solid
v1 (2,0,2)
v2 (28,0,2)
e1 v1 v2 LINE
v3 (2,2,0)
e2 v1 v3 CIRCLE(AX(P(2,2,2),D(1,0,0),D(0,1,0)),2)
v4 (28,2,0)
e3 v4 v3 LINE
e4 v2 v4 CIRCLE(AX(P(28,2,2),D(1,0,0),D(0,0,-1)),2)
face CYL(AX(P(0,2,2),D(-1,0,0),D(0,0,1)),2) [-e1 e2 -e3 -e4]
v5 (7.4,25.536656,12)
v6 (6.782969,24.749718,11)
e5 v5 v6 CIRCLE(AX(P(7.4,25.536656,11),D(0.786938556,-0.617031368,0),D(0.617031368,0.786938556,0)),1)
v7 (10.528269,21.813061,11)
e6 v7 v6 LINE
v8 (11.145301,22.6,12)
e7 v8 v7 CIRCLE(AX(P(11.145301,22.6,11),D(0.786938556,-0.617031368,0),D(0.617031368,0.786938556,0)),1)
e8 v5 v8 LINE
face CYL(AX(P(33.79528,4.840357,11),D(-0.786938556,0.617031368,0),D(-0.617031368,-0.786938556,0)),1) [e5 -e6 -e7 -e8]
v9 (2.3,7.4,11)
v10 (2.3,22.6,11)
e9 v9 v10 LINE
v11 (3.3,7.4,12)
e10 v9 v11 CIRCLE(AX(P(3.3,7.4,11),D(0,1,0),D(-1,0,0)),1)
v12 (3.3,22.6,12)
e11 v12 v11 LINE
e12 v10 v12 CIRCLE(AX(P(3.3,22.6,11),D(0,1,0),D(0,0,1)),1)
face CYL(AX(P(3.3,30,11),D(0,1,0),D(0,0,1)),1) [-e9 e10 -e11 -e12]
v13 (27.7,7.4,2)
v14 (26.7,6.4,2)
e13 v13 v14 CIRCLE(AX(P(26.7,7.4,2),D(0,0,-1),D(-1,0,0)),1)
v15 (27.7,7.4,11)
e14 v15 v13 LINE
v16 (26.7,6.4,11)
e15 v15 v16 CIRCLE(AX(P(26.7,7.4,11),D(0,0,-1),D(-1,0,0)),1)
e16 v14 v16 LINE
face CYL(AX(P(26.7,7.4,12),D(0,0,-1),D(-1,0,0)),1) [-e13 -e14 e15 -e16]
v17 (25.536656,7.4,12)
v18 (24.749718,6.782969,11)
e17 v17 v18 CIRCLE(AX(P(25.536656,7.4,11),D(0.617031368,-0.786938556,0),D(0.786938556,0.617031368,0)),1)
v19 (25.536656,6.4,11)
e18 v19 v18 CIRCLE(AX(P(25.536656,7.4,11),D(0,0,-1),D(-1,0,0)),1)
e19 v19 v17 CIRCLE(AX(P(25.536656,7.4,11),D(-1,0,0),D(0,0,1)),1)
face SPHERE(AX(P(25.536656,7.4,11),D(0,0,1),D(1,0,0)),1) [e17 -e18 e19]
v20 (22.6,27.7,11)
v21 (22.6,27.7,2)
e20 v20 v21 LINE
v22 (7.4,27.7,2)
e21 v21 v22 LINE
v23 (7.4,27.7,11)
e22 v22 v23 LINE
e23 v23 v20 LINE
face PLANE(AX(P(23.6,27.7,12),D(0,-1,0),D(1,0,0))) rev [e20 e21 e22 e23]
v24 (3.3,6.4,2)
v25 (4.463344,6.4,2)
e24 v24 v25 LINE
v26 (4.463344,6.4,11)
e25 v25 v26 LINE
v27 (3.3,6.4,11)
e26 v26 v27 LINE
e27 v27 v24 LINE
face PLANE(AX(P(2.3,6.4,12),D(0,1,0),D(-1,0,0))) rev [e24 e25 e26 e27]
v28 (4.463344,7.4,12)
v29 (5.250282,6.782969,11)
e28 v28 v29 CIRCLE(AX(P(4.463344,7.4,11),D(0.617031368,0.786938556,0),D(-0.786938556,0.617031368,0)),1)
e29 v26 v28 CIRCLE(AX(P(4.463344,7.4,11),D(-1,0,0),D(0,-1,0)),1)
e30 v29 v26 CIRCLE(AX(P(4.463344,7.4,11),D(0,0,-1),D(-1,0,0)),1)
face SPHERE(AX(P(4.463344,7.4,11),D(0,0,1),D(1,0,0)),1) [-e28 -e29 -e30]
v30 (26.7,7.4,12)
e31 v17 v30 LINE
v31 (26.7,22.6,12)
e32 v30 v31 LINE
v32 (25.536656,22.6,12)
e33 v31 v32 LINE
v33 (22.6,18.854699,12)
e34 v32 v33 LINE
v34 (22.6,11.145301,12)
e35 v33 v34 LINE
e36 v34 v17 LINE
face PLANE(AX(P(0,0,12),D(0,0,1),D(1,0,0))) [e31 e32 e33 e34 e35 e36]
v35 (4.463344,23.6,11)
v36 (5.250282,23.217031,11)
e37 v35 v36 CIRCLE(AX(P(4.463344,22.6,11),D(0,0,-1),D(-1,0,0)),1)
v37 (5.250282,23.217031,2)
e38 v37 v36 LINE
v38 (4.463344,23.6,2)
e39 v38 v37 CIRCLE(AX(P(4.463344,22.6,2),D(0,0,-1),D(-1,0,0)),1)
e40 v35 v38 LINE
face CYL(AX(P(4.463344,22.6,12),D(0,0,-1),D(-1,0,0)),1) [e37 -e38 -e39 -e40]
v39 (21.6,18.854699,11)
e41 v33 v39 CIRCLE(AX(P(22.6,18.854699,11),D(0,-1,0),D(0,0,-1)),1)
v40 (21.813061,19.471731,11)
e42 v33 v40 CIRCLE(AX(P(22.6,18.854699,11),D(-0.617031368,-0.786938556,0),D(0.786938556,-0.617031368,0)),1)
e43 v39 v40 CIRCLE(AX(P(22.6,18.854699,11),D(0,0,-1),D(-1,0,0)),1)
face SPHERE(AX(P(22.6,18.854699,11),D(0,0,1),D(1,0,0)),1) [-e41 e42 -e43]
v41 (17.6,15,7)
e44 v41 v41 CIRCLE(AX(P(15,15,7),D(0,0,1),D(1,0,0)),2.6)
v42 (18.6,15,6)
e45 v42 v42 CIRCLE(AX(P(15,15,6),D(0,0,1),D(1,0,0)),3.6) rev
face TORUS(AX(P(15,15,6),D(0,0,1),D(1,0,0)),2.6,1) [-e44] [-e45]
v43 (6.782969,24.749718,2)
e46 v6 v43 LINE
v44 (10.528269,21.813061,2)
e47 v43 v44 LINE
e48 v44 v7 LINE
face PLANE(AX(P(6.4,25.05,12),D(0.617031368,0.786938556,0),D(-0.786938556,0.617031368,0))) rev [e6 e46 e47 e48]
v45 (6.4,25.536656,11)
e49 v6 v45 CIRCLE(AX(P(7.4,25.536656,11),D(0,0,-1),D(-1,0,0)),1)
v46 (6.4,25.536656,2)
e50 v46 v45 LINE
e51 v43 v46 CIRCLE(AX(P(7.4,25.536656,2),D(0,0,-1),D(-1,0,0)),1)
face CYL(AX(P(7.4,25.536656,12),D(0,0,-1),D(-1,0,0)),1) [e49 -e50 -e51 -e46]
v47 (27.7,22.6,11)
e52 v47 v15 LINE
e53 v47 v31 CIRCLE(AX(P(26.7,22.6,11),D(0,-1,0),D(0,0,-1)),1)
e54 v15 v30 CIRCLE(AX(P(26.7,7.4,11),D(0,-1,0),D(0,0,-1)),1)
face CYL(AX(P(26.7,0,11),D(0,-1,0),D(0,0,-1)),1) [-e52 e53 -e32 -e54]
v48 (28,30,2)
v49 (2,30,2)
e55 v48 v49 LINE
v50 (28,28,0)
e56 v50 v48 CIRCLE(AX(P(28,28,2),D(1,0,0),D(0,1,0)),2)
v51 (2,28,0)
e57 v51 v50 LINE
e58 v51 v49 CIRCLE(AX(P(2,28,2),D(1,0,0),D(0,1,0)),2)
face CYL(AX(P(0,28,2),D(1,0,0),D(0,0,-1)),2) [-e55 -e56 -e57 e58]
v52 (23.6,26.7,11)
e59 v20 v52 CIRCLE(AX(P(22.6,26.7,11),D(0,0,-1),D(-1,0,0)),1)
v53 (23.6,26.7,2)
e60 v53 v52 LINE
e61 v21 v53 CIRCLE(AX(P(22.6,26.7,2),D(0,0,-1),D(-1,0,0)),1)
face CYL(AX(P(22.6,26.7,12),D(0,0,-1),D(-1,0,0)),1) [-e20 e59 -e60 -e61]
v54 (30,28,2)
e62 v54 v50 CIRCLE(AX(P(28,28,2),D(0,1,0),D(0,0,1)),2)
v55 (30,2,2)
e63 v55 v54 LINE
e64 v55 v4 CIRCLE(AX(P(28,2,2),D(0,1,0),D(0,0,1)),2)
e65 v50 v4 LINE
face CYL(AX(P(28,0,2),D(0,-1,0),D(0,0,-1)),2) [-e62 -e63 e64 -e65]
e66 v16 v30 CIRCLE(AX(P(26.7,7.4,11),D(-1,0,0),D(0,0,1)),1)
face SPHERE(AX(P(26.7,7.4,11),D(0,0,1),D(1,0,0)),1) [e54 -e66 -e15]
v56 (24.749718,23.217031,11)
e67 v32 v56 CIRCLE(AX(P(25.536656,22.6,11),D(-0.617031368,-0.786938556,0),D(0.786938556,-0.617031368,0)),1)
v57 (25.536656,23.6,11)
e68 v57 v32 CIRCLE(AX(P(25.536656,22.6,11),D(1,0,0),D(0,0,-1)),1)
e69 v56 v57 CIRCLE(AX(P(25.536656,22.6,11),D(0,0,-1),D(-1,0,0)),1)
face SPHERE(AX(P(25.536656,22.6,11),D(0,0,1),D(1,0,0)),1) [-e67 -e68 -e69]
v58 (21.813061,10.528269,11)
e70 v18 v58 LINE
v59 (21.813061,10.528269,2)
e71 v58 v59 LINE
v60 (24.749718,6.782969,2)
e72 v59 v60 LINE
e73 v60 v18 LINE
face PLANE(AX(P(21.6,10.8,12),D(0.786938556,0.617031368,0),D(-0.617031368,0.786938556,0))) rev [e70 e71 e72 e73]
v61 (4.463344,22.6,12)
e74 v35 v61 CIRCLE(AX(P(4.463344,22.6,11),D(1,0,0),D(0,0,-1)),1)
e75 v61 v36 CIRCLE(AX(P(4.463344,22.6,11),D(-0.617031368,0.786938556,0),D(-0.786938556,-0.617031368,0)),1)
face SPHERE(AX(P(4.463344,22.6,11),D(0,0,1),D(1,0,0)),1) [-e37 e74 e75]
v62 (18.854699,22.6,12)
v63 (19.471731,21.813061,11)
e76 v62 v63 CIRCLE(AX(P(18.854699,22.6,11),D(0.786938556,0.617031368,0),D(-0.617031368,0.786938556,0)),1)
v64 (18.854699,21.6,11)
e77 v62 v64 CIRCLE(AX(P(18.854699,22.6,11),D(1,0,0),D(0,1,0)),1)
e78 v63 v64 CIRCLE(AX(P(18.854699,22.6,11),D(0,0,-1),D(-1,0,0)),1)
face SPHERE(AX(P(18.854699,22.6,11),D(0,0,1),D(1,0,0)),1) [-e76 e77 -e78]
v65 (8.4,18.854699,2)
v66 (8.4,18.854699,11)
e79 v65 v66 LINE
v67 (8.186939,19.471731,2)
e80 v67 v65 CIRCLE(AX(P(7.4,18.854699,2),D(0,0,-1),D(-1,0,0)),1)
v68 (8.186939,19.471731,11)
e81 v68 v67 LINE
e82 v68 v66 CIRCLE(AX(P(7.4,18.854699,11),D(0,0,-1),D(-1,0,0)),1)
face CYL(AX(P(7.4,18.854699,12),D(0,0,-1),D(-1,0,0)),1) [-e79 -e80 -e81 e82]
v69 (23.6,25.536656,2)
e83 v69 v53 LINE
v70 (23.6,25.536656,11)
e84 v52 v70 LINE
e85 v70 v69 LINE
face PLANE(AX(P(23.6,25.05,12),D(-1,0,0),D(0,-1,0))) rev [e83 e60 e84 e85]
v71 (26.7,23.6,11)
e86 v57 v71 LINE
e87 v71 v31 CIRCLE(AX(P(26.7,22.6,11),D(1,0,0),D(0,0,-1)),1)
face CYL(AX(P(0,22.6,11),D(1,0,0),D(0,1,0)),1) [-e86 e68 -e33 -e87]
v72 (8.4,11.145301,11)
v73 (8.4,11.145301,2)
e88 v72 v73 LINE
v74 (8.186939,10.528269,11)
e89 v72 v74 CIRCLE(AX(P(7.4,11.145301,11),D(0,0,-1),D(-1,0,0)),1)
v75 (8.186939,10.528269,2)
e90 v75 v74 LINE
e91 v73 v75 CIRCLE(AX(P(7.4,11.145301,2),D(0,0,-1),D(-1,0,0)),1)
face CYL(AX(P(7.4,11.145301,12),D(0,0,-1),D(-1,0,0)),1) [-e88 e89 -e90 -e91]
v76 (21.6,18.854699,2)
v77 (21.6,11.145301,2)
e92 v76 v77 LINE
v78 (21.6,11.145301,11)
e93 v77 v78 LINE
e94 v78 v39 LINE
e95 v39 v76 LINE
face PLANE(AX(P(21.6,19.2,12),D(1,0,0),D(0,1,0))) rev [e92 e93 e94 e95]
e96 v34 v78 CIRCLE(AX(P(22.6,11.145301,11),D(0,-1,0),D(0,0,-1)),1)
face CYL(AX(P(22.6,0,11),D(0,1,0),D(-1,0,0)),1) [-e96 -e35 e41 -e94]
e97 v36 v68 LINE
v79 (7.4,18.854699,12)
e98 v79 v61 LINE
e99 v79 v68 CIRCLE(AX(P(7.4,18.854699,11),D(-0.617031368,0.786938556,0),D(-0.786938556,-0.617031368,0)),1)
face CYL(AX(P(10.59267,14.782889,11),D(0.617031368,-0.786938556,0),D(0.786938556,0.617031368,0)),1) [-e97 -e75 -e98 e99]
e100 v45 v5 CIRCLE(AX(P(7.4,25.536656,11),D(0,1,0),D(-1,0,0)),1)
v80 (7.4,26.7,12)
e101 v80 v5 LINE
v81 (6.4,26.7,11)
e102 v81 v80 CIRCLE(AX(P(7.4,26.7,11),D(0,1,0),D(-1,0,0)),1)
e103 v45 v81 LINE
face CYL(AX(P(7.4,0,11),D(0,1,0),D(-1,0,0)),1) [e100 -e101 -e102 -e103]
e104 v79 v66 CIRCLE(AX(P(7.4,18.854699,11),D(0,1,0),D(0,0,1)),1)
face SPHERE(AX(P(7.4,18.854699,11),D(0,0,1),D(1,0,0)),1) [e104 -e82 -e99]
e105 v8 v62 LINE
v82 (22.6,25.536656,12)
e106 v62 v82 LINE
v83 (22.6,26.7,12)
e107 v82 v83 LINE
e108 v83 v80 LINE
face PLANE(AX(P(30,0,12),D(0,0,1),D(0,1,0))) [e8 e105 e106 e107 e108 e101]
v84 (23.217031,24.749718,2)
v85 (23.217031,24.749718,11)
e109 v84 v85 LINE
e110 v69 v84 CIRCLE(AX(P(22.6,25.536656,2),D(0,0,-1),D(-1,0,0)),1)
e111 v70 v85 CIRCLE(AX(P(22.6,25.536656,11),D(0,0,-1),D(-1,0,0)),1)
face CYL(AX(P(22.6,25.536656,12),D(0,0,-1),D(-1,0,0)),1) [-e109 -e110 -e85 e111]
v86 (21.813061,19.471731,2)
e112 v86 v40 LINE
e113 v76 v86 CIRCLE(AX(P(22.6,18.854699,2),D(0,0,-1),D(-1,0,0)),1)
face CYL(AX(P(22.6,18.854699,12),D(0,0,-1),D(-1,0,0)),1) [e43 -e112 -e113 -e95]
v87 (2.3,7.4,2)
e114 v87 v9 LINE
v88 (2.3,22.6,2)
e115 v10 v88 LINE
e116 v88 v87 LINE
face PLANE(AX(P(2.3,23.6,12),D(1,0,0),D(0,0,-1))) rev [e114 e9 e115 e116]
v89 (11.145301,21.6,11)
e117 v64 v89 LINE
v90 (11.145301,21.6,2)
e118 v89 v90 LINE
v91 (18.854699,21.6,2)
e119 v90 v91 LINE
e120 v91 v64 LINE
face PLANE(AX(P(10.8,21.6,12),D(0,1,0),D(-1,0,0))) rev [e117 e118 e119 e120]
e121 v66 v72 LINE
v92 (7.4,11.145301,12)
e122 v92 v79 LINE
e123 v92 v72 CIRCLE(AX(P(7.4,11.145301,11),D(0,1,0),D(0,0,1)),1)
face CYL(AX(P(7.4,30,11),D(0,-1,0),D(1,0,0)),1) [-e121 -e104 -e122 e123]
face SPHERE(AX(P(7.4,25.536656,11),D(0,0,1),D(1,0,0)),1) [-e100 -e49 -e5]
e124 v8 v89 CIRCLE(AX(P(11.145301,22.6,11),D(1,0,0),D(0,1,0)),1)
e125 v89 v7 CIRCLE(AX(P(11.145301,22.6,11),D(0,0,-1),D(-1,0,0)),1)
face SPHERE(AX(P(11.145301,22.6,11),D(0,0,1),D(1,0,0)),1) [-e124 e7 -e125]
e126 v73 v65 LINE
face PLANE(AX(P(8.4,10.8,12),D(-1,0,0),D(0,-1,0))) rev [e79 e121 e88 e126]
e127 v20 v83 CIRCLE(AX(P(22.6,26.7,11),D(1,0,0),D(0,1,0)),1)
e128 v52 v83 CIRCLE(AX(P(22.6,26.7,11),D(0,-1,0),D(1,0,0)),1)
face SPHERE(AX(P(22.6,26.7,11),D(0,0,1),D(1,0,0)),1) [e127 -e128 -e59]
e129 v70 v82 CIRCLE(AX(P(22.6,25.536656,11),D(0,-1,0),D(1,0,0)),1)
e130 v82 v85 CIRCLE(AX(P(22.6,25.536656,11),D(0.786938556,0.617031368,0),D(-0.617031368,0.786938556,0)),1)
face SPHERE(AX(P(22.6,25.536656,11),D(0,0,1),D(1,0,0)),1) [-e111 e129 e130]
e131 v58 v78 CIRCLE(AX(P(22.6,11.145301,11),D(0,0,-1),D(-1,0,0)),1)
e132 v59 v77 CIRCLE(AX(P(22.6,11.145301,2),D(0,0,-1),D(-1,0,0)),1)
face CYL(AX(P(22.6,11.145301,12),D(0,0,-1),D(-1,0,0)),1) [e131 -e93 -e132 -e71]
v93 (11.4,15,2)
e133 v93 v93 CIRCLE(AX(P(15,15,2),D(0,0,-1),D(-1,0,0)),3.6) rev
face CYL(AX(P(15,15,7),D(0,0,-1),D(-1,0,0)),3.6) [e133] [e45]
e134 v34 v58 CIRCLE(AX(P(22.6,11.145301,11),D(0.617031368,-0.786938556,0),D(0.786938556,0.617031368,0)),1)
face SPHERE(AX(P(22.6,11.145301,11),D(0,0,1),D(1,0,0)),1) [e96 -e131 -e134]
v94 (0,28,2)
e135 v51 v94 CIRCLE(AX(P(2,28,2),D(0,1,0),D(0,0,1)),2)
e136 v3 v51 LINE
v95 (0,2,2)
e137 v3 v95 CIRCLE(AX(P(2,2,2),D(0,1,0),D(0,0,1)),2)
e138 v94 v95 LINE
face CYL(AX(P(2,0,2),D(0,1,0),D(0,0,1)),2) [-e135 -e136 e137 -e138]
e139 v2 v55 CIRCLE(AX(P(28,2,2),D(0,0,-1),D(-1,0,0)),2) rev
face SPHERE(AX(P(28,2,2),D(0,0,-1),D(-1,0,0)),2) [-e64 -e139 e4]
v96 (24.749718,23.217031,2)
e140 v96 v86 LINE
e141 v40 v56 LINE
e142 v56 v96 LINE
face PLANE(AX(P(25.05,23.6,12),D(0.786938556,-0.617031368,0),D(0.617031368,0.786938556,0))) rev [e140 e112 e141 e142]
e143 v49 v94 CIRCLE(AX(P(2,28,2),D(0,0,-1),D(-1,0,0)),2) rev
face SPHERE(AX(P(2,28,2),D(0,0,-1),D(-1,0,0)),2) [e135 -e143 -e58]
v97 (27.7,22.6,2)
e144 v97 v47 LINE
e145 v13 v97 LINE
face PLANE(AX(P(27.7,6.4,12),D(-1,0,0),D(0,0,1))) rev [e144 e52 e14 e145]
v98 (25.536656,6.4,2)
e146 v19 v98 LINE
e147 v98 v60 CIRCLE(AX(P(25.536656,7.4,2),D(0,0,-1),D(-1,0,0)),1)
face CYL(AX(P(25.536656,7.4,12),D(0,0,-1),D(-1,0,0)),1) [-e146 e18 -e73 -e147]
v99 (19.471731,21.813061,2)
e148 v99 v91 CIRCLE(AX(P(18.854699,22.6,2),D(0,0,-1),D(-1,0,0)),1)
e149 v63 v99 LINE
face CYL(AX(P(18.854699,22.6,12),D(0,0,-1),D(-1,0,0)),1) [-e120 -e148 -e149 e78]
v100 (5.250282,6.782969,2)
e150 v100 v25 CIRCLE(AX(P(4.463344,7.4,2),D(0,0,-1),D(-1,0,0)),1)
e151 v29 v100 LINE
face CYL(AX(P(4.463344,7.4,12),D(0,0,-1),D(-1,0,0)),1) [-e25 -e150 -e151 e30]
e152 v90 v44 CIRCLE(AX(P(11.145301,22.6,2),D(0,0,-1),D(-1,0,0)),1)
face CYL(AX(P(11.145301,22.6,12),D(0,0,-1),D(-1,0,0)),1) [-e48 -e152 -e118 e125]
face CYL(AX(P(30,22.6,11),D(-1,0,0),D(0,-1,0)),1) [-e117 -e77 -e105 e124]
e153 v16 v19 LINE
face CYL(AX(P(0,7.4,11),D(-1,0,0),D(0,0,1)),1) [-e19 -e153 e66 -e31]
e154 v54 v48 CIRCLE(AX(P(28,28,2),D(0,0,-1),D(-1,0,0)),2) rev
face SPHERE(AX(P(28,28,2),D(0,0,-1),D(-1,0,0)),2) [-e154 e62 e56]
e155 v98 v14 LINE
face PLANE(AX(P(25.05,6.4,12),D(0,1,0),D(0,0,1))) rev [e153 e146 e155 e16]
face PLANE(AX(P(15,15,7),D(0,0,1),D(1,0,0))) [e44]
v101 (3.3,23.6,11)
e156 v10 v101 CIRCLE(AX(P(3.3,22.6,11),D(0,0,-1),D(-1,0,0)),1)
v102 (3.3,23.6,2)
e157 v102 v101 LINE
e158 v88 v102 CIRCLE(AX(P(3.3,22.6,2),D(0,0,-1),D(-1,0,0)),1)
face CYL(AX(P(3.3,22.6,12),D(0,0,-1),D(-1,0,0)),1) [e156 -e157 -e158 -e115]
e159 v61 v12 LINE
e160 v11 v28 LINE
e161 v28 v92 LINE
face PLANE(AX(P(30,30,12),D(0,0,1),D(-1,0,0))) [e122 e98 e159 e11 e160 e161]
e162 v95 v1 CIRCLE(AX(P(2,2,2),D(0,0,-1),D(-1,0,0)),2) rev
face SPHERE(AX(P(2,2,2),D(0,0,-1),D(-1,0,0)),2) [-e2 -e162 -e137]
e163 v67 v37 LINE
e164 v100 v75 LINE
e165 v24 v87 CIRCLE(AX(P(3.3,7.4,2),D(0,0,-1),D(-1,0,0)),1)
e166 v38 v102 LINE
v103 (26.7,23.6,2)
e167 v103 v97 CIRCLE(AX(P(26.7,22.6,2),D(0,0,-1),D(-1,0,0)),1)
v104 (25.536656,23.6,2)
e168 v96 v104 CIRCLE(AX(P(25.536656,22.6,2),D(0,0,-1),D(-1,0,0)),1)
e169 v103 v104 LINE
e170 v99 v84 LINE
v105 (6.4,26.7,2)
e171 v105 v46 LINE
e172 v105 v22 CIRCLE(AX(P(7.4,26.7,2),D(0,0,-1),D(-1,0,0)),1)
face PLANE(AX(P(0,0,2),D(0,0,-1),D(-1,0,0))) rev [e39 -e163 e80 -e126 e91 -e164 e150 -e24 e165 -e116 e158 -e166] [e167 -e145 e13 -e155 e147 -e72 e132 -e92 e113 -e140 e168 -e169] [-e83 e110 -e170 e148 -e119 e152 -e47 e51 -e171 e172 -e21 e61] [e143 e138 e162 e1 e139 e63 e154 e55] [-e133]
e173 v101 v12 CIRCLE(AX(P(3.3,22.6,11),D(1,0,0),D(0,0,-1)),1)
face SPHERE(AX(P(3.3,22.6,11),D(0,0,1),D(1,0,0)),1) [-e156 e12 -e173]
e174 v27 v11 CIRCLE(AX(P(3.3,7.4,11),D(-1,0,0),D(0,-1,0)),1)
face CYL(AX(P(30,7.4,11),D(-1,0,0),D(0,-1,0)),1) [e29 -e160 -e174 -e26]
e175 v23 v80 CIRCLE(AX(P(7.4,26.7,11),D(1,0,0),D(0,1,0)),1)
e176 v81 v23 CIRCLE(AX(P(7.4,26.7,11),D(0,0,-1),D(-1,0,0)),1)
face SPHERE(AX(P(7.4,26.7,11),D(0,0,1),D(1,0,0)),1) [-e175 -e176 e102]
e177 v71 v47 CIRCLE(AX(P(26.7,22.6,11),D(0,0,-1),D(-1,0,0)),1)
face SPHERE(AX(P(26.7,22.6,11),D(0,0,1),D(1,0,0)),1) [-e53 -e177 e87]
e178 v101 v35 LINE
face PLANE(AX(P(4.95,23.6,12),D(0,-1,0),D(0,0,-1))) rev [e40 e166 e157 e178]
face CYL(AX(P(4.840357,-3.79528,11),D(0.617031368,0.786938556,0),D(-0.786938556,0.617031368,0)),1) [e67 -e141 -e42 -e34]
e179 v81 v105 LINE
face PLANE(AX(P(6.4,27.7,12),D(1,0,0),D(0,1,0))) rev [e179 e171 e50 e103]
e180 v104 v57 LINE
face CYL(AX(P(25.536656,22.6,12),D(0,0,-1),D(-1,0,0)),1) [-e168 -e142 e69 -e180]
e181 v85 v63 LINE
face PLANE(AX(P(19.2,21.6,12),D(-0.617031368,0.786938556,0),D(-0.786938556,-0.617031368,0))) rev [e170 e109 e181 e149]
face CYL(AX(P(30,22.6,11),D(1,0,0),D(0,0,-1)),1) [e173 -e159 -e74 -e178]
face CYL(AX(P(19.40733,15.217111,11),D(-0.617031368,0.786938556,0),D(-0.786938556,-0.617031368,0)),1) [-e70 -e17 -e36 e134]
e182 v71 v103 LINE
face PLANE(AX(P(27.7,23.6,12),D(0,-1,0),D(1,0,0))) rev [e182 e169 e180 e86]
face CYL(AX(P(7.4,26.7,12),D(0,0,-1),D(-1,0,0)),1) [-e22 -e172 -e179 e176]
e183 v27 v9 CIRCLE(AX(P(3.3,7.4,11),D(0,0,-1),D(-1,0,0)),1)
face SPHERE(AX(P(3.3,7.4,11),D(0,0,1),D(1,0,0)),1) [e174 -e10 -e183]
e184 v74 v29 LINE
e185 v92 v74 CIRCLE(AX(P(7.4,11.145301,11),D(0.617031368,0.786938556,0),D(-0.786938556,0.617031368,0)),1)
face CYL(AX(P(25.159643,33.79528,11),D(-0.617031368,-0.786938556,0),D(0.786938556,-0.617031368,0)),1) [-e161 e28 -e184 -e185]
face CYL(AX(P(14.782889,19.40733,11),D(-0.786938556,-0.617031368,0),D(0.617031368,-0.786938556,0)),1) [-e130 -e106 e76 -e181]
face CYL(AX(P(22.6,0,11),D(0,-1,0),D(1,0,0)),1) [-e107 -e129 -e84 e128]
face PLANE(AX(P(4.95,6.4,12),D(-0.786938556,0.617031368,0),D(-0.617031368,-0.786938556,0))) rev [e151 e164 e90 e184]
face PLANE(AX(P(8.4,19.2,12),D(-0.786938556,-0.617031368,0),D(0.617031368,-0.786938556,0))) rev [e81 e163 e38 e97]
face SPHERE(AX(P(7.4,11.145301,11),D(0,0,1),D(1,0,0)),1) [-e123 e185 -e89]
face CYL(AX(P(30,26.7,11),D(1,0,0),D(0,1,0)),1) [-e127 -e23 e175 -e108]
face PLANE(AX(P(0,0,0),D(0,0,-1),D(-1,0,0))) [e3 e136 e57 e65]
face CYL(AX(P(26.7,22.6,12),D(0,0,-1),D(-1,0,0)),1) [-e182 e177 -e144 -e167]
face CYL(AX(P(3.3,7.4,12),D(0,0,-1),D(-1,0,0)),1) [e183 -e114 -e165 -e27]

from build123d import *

# Parameters (mm, degrees)
ESQUISSE1_W                        = 30
ESQUISSE1_H                        = 30
BOSS_EXTRU_1_DEPTH                 = 2
BOSS_EXTRU_5_DEPTH                 = 10
CONG_1_R                           = 1
ESQUISSE2_R                        = 3.6
BOSS_EXTRU_6_DEPTH                 = 5
R_P_TITION_CIRCULAIRE1_COUNT       = 3
R_P_TITION_CIRCULAIRE1_ANGLE       = 180
CONG_1_OF_R_P_TITION_CIRCULAIRE1_R = 1
CONG_2_R                           = 2
CONG_3_R                           = 1
CONG_4_R                           = 2


with BuildPart() as part:
    # Esquisse1 → Boss.-Extru.1 (new body)
    with BuildSketch(Plane.XY):
        with Locations((15, 15)):
            Rectangle(ESQUISSE1_W, ESQUISSE1_H)
    extrude(amount=BOSS_EXTRU_1_DEPTH)

    # Esquisse5 → Boss.-Extru.5 (add)
    with BuildSketch(Plane.XY.offset(2)):
        Polygon((27.7, 6.4), (27.7, 23.6), (25.05, 23.6), (21.6, 19.2), (21.6, 10.8), (25.05, 6.4), align=None)
    boss_extru_5 = extrude(amount=BOSS_EXTRU_5_DEPTH)

    # Congé1
    cong_1_edges = [part.edges().sort_by_distance(p)[0] for p in [
        (25.05, 6.4, 7),
        (27.7, 6.4, 7),
        (27.7, 23.6, 7),
        (25.05, 23.6, 7),
        (21.6, 19.2, 7),
        (21.6, 10.8, 7),
    ]]
    fillet(cong_1_edges, radius=CONG_1_R)

    # Esquisse2 → Boss.-Extru.6 (add)
    with BuildSketch(Plane.XY.offset(2)):
        with Locations(Location((15, 15, 0), (0, 0, 180))):
            Circle(ESQUISSE2_R)
    extrude(amount=BOSS_EXTRU_6_DEPTH)

    # Répétition circulaire1: Boss.-Extru.5 ×3 about axis
    r_p_tition_circulaire1_axis = Axis((15, 15, 0), (0, 0, 1))
    for i in range(1, R_P_TITION_CIRCULAIRE1_COUNT):
        add(boss_extru_5.rotate(r_p_tition_circulaire1_axis, i * R_P_TITION_CIRCULAIRE1_ANGLE / (R_P_TITION_CIRCULAIRE1_COUNT - 1)))

    # Congé1 of Répétition circulaire1
    cong_1_of_r_p_tition_circulaire1_edges = [part.edges().sort_by_distance(p)[0] for p in [
        (23.6, 25.05, 7),
        (23.6, 27.7, 7),
        (6.4, 27.7, 7),
        (6.4, 25.05, 7),
        (10.8, 21.6, 7),
        (19.2, 21.6, 7),
        (4.95, 23.6, 7),
        (2.3, 23.6, 7),
        (2.3, 6.4, 7),
        (4.95, 6.4, 7),
        (8.4, 10.8, 7),
        (8.4, 19.2, 7),
    ]]
    fillet(cong_1_of_r_p_tition_circulaire1_edges, radius=CONG_1_OF_R_P_TITION_CIRCULAIRE1_R)

    # Congé2
    cong_2_edges = [part.edges().sort_by_distance(p)[0] for p in [
        (0, 30, 1),
        (30, 30, 1),
        (30, 0, 1),
        (0, 0, 1),
    ]]
    fillet(cong_2_edges, radius=CONG_2_R)

    # Congé3
    cong_3_edges = [part.edges().sort_by_distance(p)[0] for p in [
        (15, 27.7, 12),
        (23.6, 26.118328167, 12),
        (6.4, 26.118328167, 12),
        (8.655619048, 23.28138961, 12),
        (15, 21.6, 12),
        (21.344380952, 23.28138961, 12),
        (6.500824998, 25.099067124, 12),
        (10.818910387, 21.654764961, 12),
        (19.181089613, 21.654764961, 12),
        (23.499175002, 25.099067124, 12),
        (6.692893219, 27.407106781, 12),
        (23.307106781, 27.407106781, 12),
        (2.3, 15, 12),
        (3.881671833, 23.6, 12),
        (3.881671833, 6.4, 12),
        (6.71861039, 8.655619048, 12),
        (8.4, 15, 12),
        (6.71861039, 21.344380952, 12),
        (4.900932876, 6.500824998, 12),
        (8.345235039, 10.818910387, 12),
        (8.345235039, 19.181089613, 12),
        (4.900932876, 23.499175002, 12),
        (2.592893219, 6.692893219, 12),
        (2.592893219, 23.307106781, 12),
        (27.7, 15, 12),
        (26.118328167, 6.4, 12),
        (26.118328167, 23.6, 12),
        (23.28138961, 21.344380952, 12),
        (21.6, 15, 12),
        (23.28138961, 8.655619048, 12),
        (25.099067124, 23.499175002, 12),
        (21.654764961, 19.181089613, 12),
        (21.654764961, 10.818910387, 12),
        (25.099067124, 6.500824998, 12),
        (27.407106781, 23.307106781, 12),
        (27.407106781, 6.692893219, 12),
        (18.6, 15, 7),
    ]]
    fillet(cong_3_edges, radius=CONG_3_R)

    # Congé4
    cong_4_edges = [part.edges().sort_by_distance(p)[0] for p in [
        (29.414213562, 29.414213562, 0),
        (15, 30, 0),
        (0.585786438, 29.414213562, 0),
        (0, 15, 0),
        (0.585786438, 0.585786438, 0),
        (15, 0, 0),
        (29.414213562, 0.585786438, 0),
        (30, 15, 0),
    ]]
    fillet(cong_4_edges, radius=CONG_4_R - 0.0001)  # a hair under: the kernel refuses the full size


solid = part.part
